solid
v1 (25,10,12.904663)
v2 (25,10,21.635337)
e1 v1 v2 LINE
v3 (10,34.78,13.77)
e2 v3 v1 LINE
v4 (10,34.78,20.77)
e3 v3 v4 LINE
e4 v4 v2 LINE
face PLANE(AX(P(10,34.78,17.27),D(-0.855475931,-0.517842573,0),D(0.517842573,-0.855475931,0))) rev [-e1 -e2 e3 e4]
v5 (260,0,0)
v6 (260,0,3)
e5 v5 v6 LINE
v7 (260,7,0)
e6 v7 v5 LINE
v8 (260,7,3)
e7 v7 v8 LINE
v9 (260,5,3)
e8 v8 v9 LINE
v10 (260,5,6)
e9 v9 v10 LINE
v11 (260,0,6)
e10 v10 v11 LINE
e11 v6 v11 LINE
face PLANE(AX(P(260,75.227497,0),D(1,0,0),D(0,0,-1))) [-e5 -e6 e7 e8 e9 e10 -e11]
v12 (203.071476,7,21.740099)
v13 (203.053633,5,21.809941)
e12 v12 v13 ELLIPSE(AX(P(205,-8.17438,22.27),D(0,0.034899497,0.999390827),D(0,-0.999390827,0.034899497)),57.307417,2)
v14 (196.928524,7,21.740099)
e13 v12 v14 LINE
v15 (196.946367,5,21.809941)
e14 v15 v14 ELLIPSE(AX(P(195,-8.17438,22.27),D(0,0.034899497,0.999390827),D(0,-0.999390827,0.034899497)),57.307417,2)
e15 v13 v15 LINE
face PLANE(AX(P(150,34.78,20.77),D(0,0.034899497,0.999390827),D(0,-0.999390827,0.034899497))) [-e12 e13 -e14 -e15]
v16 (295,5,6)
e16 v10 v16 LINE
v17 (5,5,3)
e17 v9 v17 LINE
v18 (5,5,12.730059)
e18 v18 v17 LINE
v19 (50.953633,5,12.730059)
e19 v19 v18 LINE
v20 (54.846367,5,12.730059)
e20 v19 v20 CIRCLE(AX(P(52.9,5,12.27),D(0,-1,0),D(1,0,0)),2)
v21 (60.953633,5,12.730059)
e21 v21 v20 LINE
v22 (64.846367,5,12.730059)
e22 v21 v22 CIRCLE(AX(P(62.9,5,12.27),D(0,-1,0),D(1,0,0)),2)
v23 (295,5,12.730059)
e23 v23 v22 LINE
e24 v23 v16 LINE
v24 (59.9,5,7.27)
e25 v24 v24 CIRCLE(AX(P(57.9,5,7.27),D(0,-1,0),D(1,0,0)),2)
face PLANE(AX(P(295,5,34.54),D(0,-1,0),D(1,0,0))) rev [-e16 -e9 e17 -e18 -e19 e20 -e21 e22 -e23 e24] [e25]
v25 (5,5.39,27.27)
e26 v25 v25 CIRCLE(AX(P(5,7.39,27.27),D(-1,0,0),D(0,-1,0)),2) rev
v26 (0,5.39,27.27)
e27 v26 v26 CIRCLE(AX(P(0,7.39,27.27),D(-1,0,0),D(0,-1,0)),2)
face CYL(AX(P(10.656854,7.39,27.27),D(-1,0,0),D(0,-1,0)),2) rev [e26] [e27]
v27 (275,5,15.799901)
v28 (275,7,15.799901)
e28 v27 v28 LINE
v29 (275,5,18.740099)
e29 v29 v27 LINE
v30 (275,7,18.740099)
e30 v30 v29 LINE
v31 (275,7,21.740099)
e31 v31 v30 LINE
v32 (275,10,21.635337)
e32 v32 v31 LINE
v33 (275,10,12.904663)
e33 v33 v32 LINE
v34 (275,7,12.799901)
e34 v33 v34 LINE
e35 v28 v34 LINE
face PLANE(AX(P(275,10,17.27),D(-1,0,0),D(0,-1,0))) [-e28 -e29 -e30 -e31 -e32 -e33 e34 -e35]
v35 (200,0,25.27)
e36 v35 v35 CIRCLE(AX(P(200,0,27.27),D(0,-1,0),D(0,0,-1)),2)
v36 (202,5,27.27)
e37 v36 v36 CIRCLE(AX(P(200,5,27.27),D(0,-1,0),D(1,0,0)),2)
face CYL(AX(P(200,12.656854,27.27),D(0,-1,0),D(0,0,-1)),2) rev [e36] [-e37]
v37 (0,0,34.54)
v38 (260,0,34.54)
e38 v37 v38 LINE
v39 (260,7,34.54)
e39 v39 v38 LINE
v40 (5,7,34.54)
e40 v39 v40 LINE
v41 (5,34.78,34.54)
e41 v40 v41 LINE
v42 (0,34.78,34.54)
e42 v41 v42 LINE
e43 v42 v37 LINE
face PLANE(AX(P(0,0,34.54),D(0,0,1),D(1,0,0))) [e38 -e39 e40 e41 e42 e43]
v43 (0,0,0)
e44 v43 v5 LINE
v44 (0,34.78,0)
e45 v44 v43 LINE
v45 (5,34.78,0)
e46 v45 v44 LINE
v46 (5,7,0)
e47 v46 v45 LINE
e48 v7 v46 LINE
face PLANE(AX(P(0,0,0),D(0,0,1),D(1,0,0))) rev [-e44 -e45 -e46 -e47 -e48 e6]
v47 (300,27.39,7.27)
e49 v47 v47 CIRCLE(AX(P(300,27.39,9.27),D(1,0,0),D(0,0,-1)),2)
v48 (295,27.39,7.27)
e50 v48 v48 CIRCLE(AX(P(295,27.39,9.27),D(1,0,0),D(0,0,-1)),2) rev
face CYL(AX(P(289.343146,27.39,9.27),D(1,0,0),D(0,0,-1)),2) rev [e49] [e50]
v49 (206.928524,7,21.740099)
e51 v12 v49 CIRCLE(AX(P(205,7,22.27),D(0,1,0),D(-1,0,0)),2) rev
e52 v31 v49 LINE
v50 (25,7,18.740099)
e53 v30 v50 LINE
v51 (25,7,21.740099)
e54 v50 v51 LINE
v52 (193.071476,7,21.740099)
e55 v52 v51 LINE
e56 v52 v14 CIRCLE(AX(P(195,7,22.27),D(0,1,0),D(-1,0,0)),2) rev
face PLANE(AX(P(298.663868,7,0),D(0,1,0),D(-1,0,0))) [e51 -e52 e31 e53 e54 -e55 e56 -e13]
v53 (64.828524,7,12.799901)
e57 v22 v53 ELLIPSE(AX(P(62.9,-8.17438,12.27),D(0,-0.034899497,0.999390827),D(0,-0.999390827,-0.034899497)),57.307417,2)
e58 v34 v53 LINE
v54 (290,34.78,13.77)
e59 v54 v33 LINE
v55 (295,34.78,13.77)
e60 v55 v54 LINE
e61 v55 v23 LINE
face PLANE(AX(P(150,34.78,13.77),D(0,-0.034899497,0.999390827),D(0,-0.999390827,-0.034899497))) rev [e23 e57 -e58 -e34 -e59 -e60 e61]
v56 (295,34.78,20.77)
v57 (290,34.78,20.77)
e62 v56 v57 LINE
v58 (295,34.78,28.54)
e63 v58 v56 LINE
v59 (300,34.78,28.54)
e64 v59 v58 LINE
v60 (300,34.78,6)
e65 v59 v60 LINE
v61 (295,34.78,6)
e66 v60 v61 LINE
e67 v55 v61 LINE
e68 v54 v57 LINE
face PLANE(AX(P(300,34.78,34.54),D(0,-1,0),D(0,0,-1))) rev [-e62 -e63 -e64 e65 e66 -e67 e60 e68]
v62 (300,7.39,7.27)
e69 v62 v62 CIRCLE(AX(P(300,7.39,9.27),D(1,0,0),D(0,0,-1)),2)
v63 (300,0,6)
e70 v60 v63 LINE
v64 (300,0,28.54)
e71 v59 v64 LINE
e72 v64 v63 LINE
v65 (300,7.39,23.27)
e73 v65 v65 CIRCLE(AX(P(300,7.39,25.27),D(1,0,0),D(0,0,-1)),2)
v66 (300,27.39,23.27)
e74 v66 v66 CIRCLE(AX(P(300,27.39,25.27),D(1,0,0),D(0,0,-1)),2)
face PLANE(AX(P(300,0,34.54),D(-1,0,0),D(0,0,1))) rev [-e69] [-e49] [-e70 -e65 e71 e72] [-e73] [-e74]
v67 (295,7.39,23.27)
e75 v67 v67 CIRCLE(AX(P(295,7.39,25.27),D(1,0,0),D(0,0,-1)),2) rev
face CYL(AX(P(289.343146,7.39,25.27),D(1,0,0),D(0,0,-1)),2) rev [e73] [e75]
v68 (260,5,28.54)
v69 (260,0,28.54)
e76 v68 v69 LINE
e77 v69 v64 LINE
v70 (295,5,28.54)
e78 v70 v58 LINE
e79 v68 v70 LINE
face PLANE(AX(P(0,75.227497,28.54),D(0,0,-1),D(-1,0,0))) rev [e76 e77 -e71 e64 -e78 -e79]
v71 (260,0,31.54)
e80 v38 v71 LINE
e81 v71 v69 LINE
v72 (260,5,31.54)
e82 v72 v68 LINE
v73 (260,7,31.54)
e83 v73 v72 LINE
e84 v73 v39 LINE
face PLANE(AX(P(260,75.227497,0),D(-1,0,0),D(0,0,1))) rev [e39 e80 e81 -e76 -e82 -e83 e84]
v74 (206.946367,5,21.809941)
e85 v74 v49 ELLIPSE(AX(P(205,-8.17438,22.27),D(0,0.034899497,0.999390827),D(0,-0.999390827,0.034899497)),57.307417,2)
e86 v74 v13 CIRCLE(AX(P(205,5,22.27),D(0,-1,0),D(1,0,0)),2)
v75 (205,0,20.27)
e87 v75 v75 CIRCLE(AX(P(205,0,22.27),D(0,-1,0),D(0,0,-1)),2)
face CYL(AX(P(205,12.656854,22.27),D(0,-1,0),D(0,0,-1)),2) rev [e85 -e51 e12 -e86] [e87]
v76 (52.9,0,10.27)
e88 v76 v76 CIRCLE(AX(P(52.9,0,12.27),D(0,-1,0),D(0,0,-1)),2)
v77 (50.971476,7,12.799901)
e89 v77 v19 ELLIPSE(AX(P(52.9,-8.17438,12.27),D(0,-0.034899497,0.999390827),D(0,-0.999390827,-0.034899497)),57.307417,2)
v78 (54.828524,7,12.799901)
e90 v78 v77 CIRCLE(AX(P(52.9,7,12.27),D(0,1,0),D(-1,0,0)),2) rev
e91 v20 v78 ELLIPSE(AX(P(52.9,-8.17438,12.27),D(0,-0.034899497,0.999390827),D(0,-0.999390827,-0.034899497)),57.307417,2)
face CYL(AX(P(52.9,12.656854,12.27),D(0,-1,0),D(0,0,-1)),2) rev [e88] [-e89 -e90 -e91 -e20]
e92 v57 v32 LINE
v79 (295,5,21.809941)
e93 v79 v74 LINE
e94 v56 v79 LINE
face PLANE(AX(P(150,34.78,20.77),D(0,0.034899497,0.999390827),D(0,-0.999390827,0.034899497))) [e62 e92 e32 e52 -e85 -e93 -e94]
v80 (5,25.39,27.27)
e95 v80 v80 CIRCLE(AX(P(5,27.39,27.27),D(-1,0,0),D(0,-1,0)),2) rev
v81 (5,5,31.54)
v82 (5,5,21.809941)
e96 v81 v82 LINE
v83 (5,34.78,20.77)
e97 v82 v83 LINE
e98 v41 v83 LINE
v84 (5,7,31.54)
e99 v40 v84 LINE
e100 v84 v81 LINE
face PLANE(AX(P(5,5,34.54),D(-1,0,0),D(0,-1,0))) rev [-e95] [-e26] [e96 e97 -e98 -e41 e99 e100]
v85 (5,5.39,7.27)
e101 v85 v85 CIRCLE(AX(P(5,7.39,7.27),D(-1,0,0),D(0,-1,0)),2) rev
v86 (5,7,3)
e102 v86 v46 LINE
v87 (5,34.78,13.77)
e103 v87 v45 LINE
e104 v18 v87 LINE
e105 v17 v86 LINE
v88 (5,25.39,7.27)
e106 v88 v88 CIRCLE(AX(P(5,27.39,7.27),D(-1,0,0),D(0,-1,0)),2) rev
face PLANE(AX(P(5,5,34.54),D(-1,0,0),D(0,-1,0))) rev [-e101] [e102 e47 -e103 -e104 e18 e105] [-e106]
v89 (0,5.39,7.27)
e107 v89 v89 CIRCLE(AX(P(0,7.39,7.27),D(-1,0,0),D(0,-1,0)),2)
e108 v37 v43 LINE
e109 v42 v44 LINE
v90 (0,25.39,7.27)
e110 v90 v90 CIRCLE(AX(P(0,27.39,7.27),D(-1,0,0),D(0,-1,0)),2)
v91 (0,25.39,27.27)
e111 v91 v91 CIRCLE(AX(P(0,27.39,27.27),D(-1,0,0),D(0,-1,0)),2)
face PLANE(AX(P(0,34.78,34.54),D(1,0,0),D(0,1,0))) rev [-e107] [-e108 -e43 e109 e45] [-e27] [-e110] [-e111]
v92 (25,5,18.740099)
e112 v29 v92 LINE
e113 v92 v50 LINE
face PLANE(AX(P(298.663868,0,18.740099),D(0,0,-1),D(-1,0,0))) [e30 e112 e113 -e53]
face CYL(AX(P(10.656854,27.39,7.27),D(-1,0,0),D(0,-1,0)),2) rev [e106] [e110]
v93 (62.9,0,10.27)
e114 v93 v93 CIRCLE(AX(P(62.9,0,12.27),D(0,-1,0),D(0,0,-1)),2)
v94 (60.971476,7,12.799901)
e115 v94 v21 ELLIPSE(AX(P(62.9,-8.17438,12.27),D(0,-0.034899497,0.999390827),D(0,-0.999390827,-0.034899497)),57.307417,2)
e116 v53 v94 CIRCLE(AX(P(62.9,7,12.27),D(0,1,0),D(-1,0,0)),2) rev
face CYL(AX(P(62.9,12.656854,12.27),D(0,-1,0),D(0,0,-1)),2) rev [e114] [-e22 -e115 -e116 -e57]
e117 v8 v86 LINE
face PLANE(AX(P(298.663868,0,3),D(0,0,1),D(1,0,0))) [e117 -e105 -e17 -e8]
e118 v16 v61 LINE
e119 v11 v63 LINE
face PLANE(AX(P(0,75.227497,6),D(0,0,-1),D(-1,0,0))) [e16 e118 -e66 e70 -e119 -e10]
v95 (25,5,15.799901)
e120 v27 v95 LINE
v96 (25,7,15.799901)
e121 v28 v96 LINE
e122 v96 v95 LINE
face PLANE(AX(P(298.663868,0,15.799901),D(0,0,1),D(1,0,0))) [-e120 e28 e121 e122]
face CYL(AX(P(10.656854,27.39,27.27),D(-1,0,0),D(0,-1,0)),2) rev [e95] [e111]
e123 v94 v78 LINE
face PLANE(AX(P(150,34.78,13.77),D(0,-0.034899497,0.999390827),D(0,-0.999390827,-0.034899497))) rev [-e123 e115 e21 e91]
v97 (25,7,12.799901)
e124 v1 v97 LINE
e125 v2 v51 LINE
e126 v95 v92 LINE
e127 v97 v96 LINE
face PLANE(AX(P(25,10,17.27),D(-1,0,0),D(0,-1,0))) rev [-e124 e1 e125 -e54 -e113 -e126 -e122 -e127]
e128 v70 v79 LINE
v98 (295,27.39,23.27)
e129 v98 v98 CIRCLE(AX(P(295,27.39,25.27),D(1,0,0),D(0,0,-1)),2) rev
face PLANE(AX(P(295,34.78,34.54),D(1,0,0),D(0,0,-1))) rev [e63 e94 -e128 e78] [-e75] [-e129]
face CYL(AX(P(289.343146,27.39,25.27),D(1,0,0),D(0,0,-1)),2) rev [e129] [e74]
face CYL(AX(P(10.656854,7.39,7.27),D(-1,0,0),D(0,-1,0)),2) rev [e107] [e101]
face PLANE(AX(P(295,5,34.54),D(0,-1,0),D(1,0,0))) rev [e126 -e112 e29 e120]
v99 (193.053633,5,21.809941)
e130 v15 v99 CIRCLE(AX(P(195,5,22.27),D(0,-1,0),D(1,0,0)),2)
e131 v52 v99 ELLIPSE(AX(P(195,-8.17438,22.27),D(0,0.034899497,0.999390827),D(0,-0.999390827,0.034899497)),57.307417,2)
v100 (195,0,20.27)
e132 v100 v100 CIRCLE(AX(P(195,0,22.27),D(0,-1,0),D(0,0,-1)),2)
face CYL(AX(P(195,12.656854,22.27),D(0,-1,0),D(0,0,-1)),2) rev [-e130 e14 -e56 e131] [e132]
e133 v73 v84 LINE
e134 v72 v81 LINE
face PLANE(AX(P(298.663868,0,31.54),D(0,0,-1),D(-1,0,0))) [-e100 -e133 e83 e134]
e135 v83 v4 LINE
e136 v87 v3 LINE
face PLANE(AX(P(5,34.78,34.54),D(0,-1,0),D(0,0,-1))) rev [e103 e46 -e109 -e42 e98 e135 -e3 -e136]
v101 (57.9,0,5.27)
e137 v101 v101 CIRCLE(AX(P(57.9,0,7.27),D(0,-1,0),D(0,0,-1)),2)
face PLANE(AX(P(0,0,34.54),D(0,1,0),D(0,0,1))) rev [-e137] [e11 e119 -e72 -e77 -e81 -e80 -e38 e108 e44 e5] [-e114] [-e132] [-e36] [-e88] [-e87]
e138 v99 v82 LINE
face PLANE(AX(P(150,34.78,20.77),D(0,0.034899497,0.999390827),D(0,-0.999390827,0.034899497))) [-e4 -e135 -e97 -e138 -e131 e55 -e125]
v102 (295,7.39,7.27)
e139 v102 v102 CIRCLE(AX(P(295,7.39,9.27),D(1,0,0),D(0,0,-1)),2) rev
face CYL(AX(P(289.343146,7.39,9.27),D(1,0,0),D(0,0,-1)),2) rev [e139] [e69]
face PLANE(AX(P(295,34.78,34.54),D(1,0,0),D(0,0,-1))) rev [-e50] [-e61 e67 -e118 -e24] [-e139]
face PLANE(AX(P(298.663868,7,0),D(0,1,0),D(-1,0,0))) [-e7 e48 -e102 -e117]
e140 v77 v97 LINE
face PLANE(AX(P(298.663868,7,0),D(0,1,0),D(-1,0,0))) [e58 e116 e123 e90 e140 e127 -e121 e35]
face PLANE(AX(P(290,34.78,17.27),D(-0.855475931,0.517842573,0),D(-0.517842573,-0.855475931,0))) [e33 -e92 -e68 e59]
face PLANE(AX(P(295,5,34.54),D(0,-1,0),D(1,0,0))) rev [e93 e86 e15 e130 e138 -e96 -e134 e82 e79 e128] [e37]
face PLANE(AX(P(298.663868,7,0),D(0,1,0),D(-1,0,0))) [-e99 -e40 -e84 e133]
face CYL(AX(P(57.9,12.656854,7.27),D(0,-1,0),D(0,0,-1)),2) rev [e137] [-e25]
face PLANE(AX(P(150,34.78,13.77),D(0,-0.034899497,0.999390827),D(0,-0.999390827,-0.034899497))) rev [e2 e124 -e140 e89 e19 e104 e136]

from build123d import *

# Parameters (mm, degrees)
EXTRUDE_1_DEPTH          = 34.54
CUT_EXTRUDE_1_REACH      = 305.978
SKETCH_2_W               = 40
SKETCH_2_H               = 6
SKETCH_3_R               = 2
CUT_EXTRUDE_2_DEPTH      = 5
SKETCH_4_R               = 2
CUT_EXTRUDE_3_DEPTH      = 5
RIB_START                = 5
RIB_7_DEPTH              = 20
RIB_START_2              = 12.730059485
RIB_7_2_DEPTH            = 9.07988103
RIB_START_3              = 275
RIB_19_DEPTH             = 20
RIB_START_4              = 147.269934089
RIB_19_2_DEPTH           = 35.576868781
EXTRUDE_2_REACH          = 301.045
SKETCH_8_W               = 3
SKETCH_8_H               = 2
CUT_EXTRUDE_4_DEPTH      = 304.978058419
CUT_EXTRUDE_4_DEPTH_BACK = 304.978058419
SKETCH_9_W               = 35
SKETCH_9_H               = 3
CUT_EXTRUDE_5_REACH      = 305.978
SKETCH_10_R              = 2
CUT_EXTRUDE_6_REACH      = 305.978
SKETCH_11_R              = 2


with BuildPart() as part:
    # 草图1 → 凸台-拉伸1 (new body)
    with BuildSketch(Plane.XY):
        Polygon((0, 0), (300, 0), (300, 34.78), (295, 34.78), (295, 5), (5, 5), (5, 34.78), (0, 34.78), align=None)
    extrude(amount=EXTRUDE_1_DEPTH)

    # 切除-拉伸1: up to this face of the body (flat: up to its plane)
    cut_extrude_1_end = Plane(part.part.faces().sort_by_distance((297.5, 34.78, 17.27))[0])
    # 草图2 → 切除-拉伸1 (cut, up to the picked face)
    with BuildSketch(Plane.XZ, mode=Mode.PRIVATE) as cut_extrude_1_sk1:
        with Locations((280, 31.54)):
            Rectangle(SKETCH_2_W, SKETCH_2_H)
    cut_extrude_1_tool1 = split(extrude(cut_extrude_1_sk1.sketch, amount=-CUT_EXTRUDE_1_REACH, mode=Mode.PRIVATE), bisect_by=cut_extrude_1_end, keep=Keep.BOTH, mode=Mode.PRIVATE)
    # 草图2 → 切除-拉伸1 (cut, up to the picked face)
    with BuildSketch(Plane.XZ, mode=Mode.PRIVATE) as cut_extrude_1_sk2:
        with Locations((280, 3)):
            Rectangle(SKETCH_2_W, SKETCH_2_H)
    cut_extrude_1_tool2 = split(extrude(cut_extrude_1_sk2.sketch, amount=-CUT_EXTRUDE_1_REACH, mode=Mode.PRIVATE), bisect_by=cut_extrude_1_end, keep=Keep.BOTH, mode=Mode.PRIVATE)
    add(cut_extrude_1_tool1.solids().sort_by(Axis((280, 0, 31.54), (0, 1, 0)))[0], mode=Mode.SUBTRACT)
    add(cut_extrude_1_tool2.solids().sort_by(Axis((280, 0, 3), (0, 1, 0)))[0], mode=Mode.SUBTRACT)

    # 草图3 → 切除-拉伸2 (cut)
    with BuildSketch(Plane(origin=(300, 0, 0), x_dir=(0, 0, -1), z_dir=(1, 0, 0))):
        with Locations((-25.27, 7.39)):
            Circle(SKETCH_3_R)
        with Locations((-25.27, 27.39)):
            Circle(SKETCH_3_R)
        with Locations((-9.27, 27.39)):
            Circle(SKETCH_3_R)
        with Locations((-9.27, 7.39)):
            Circle(SKETCH_3_R)
    extrude(amount=-CUT_EXTRUDE_2_DEPTH, mode=Mode.SUBTRACT)

    # 草图4 → 切除-拉伸3 (cut)
    with BuildSketch(Plane.ZY):
        with Locations(Location((7.27, 27.39, 0), (0, 0, 270))):
            Circle(SKETCH_4_R)
        with Locations(Location((27.27, 27.39, 0), (0, 0, 270))):
            Circle(SKETCH_4_R)
        with Locations(Location((27.27, 7.39, 0), (0, 0, 270))):
            Circle(SKETCH_4_R)
        with Locations(Location((7.27, 7.39, 0), (0, 0, 270))):
            Circle(SKETCH_4_R)
    extrude(amount=-CUT_EXTRUDE_3_DEPTH, mode=Mode.SUBTRACT)

    # 筋7: read off the stored shape, not the designer's step
    # 筋7 outline → 筋7 (add)
    with BuildSketch(Plane.YZ.offset(RIB_START)):
        Polygon((34.78, 13.77), (34.78, 20.77), (5, 21.809940515), (5, 12.730059485), align=None)
    extrude(amount=RIB_7_DEPTH)

    # Rib 7 2 outline → Rib 7 2 (cut)
    with BuildSketch(Plane.XY.offset(RIB_START_2)):
        Polygon((25, 34.78), (10, 34.78), (25, 10), align=None)
    extrude(amount=RIB_7_2_DEPTH, mode=Mode.SUBTRACT)

    # 筋19: read off the stored shape, not the designer's step
    # 筋19 outline → 筋19 (add)
    with BuildSketch(Plane.YZ.offset(RIB_START_3)):
        Polygon((34.78, 13.77), (34.78, 20.77), (5, 21.809940515), (5, 12.730059485), align=None)
    extrude(amount=RIB_19_DEPTH)

    # Rib 19 2 outline → Rib 19 2 (cut)
    with BuildSketch(Plane(origin=(0, 0, 0), x_dir=(0.8556156704777578, -0.5172963390397041, -0.018064386206466228), z_dir=(0.5176116540736858, 0.8550944525297293, 0.02986055625713262)).offset(RIB_START_4)):
        Polygon((229.730516914, -21.273162039), (229.888231169, -12.547807193), (216, -12.547807193), (216, -23), (229.699303632, -23), align=None)
    extrude(amount=RIB_19_2_DEPTH, mode=Mode.SUBTRACT)

    # 凸台-拉伸2: up to this face of the body (flat: up to its plane)
    extrude_2_end = Plane(part.part.faces().sort_by_distance((295, 20.622218635, 24.86118076))[0])
    # 草图8 → 凸台-拉伸2 (add, up to the picked face)
    with BuildSketch(Plane(origin=(5, 0, 0), x_dir=(0, 0, -1), z_dir=(1, 0, 0)), mode=Mode.PRIVATE) as extrude_2_sk1:
        with Locations((-33.04, 6)):
            Rectangle(SKETCH_8_W, SKETCH_8_H)
    extrude_2_tool1 = split(extrude(extrude_2_sk1.sketch, amount=EXTRUDE_2_REACH, mode=Mode.PRIVATE), bisect_by=extrude_2_end, keep=Keep.BOTH, mode=Mode.PRIVATE)
    # 草图8 → 凸台-拉伸2 (add, up to the picked face)
    with BuildSketch(Plane(origin=(5, 0, 0), x_dir=(0, 0, -1), z_dir=(1, 0, 0)), mode=Mode.PRIVATE) as extrude_2_sk2:
        Polygon((-21.740098976, 7), (-21.809940515, 5), (-18.740098976, 5), (-18.740098976, 7), align=None)
    extrude_2_tool2 = split(extrude(extrude_2_sk2.sketch, amount=EXTRUDE_2_REACH, mode=Mode.PRIVATE), bisect_by=extrude_2_end, keep=Keep.BOTH, mode=Mode.PRIVATE)
    # 草图8 → 凸台-拉伸2 (add, up to the picked face)
    with BuildSketch(Plane(origin=(5, 0, 0), x_dir=(0, 0, -1), z_dir=(1, 0, 0)), mode=Mode.PRIVATE) as extrude_2_sk3:
        Polygon((-15.799901024, 7), (-15.799901024, 5), (-12.730059485, 5), (-12.799901024, 7), align=None)
    extrude_2_tool3 = split(extrude(extrude_2_sk3.sketch, amount=EXTRUDE_2_REACH, mode=Mode.PRIVATE), bisect_by=extrude_2_end, keep=Keep.BOTH, mode=Mode.PRIVATE)
    # 草图8 → 凸台-拉伸2 (add, up to the picked face)
    with BuildSketch(Plane(origin=(5, 0, 0), x_dir=(0, 0, -1), z_dir=(1, 0, 0)), mode=Mode.PRIVATE) as extrude_2_sk4:
        with Locations((-1.5, 6)):
            Rectangle(SKETCH_8_W, SKETCH_8_H)
    extrude_2_tool4 = split(extrude(extrude_2_sk4.sketch, amount=EXTRUDE_2_REACH, mode=Mode.PRIVATE), bisect_by=extrude_2_end, keep=Keep.BOTH, mode=Mode.PRIVATE)
    add(extrude_2_tool1.solids().sort_by(Axis((5, 6, 33.04), (1, 0, 0)))[0])
    add(extrude_2_tool2.solids().sort_by(Axis((5, 5.996165, 20.257626), (1, 0, 0)))[0])
    add(extrude_2_tool3.solids().sort_by(Axis((5, 5.996165, 14.282374), (1, 0, 0)))[0])
    add(extrude_2_tool4.solids().sort_by(Axis((5, 6, 1.5), (1, 0, 0)))[0])

    # 草图9 → 切除-拉伸4 (cut, two sides: drawn at the far end of the back side and taken through both)
    with BuildSketch(Plane.XZ.offset(-CUT_EXTRUDE_4_DEPTH_BACK)):
        with Locations((277.5, 1.5)):
            Rectangle(SKETCH_9_W, SKETCH_9_H)
        with Locations((277.5, 33.04)):
            Rectangle(SKETCH_9_W, SKETCH_9_H)
    extrude(amount=CUT_EXTRUDE_4_DEPTH + CUT_EXTRUDE_4_DEPTH_BACK, mode=Mode.SUBTRACT)

    # 切除-拉伸5: up to this face of the body (flat: up to its plane)
    cut_extrude_5_end = Plane(part.part.faces().sort_by_distance((132.5, 7, 33.04))[0])
    # 草图10 → 切除-拉伸5 (cut, up to the picked face)
    with BuildSketch(Plane.XZ, mode=Mode.PRIVATE) as cut_extrude_5_sk1:
        with Locations(Location((205, 22.27, 0), (0, 0, 270))):
            Circle(SKETCH_10_R)
    cut_extrude_5_tool1 = split(extrude(cut_extrude_5_sk1.sketch, amount=-CUT_EXTRUDE_5_REACH, mode=Mode.PRIVATE), bisect_by=cut_extrude_5_end, keep=Keep.BOTH, mode=Mode.PRIVATE)
    # 草图10 → 切除-拉伸5 (cut, up to the picked face)
    with BuildSketch(Plane.XZ, mode=Mode.PRIVATE) as cut_extrude_5_sk2:
        with Locations(Location((200, 27.27, 0), (0, 0, 270))):
            Circle(SKETCH_10_R)
    cut_extrude_5_tool2 = split(extrude(cut_extrude_5_sk2.sketch, amount=-CUT_EXTRUDE_5_REACH, mode=Mode.PRIVATE), bisect_by=cut_extrude_5_end, keep=Keep.BOTH, mode=Mode.PRIVATE)
    # 草图10 → 切除-拉伸5 (cut, up to the picked face)
    with BuildSketch(Plane.XZ, mode=Mode.PRIVATE) as cut_extrude_5_sk3:
        with Locations(Location((195, 22.27, 0), (0, 0, 270))):
            Circle(SKETCH_10_R)
    cut_extrude_5_tool3 = split(extrude(cut_extrude_5_sk3.sketch, amount=-CUT_EXTRUDE_5_REACH, mode=Mode.PRIVATE), bisect_by=cut_extrude_5_end, keep=Keep.BOTH, mode=Mode.PRIVATE)
    add(cut_extrude_5_tool1.solids().sort_by(Axis((205, 0, 22.27), (0, 1, 0)))[0], mode=Mode.SUBTRACT)
    add(cut_extrude_5_tool2.solids().sort_by(Axis((200, 0, 27.27), (0, 1, 0)))[0], mode=Mode.SUBTRACT)
    add(cut_extrude_5_tool3.solids().sort_by(Axis((195, 0, 22.27), (0, 1, 0)))[0], mode=Mode.SUBTRACT)

    # 切除-拉伸6: up to this face of the body (flat: up to its plane)
    cut_extrude_6_end = Plane(part.part.faces().sort_by_distance((150, 7, 14.299901024))[0])
    # 草图11 → 切除-拉伸6 (cut, up to the picked face)
    with BuildSketch(Plane.XZ, mode=Mode.PRIVATE) as cut_extrude_6_sk1:
        with Locations(Location((52.9, 12.27, 0), (0, 0, 270))):
            Circle(SKETCH_11_R)
    cut_extrude_6_tool1 = split(extrude(cut_extrude_6_sk1.sketch, amount=-CUT_EXTRUDE_6_REACH, mode=Mode.PRIVATE), bisect_by=cut_extrude_6_end, keep=Keep.BOTH, mode=Mode.PRIVATE)
    # 草图11 → 切除-拉伸6 (cut, up to the picked face)
    with BuildSketch(Plane.XZ, mode=Mode.PRIVATE) as cut_extrude_6_sk2:
        with Locations(Location((62.9, 12.27, 0), (0, 0, 270))):
            Circle(SKETCH_11_R)
    cut_extrude_6_tool2 = split(extrude(cut_extrude_6_sk2.sketch, amount=-CUT_EXTRUDE_6_REACH, mode=Mode.PRIVATE), bisect_by=cut_extrude_6_end, keep=Keep.BOTH, mode=Mode.PRIVATE)
    # 草图11 → 切除-拉伸6 (cut, up to the picked face)
    with BuildSketch(Plane.XZ, mode=Mode.PRIVATE) as cut_extrude_6_sk3:
        with Locations(Location((57.9, 7.27, 0), (0, 0, 270))):
            Circle(SKETCH_11_R)
    cut_extrude_6_tool3 = split(extrude(cut_extrude_6_sk3.sketch, amount=-CUT_EXTRUDE_6_REACH, mode=Mode.PRIVATE), bisect_by=cut_extrude_6_end, keep=Keep.BOTH, mode=Mode.PRIVATE)
    add(cut_extrude_6_tool1.solids().sort_by(Axis((52.9, 0, 12.27), (0, 1, 0)))[0], mode=Mode.SUBTRACT)
    add(cut_extrude_6_tool2.solids().sort_by(Axis((62.9, 0, 12.27), (0, 1, 0)))[0], mode=Mode.SUBTRACT)
    add(cut_extrude_6_tool3.solids().sort_by(Axis((57.9, 0, 7.27), (0, 1, 0)))[0], mode=Mode.SUBTRACT)


solid = part.part
